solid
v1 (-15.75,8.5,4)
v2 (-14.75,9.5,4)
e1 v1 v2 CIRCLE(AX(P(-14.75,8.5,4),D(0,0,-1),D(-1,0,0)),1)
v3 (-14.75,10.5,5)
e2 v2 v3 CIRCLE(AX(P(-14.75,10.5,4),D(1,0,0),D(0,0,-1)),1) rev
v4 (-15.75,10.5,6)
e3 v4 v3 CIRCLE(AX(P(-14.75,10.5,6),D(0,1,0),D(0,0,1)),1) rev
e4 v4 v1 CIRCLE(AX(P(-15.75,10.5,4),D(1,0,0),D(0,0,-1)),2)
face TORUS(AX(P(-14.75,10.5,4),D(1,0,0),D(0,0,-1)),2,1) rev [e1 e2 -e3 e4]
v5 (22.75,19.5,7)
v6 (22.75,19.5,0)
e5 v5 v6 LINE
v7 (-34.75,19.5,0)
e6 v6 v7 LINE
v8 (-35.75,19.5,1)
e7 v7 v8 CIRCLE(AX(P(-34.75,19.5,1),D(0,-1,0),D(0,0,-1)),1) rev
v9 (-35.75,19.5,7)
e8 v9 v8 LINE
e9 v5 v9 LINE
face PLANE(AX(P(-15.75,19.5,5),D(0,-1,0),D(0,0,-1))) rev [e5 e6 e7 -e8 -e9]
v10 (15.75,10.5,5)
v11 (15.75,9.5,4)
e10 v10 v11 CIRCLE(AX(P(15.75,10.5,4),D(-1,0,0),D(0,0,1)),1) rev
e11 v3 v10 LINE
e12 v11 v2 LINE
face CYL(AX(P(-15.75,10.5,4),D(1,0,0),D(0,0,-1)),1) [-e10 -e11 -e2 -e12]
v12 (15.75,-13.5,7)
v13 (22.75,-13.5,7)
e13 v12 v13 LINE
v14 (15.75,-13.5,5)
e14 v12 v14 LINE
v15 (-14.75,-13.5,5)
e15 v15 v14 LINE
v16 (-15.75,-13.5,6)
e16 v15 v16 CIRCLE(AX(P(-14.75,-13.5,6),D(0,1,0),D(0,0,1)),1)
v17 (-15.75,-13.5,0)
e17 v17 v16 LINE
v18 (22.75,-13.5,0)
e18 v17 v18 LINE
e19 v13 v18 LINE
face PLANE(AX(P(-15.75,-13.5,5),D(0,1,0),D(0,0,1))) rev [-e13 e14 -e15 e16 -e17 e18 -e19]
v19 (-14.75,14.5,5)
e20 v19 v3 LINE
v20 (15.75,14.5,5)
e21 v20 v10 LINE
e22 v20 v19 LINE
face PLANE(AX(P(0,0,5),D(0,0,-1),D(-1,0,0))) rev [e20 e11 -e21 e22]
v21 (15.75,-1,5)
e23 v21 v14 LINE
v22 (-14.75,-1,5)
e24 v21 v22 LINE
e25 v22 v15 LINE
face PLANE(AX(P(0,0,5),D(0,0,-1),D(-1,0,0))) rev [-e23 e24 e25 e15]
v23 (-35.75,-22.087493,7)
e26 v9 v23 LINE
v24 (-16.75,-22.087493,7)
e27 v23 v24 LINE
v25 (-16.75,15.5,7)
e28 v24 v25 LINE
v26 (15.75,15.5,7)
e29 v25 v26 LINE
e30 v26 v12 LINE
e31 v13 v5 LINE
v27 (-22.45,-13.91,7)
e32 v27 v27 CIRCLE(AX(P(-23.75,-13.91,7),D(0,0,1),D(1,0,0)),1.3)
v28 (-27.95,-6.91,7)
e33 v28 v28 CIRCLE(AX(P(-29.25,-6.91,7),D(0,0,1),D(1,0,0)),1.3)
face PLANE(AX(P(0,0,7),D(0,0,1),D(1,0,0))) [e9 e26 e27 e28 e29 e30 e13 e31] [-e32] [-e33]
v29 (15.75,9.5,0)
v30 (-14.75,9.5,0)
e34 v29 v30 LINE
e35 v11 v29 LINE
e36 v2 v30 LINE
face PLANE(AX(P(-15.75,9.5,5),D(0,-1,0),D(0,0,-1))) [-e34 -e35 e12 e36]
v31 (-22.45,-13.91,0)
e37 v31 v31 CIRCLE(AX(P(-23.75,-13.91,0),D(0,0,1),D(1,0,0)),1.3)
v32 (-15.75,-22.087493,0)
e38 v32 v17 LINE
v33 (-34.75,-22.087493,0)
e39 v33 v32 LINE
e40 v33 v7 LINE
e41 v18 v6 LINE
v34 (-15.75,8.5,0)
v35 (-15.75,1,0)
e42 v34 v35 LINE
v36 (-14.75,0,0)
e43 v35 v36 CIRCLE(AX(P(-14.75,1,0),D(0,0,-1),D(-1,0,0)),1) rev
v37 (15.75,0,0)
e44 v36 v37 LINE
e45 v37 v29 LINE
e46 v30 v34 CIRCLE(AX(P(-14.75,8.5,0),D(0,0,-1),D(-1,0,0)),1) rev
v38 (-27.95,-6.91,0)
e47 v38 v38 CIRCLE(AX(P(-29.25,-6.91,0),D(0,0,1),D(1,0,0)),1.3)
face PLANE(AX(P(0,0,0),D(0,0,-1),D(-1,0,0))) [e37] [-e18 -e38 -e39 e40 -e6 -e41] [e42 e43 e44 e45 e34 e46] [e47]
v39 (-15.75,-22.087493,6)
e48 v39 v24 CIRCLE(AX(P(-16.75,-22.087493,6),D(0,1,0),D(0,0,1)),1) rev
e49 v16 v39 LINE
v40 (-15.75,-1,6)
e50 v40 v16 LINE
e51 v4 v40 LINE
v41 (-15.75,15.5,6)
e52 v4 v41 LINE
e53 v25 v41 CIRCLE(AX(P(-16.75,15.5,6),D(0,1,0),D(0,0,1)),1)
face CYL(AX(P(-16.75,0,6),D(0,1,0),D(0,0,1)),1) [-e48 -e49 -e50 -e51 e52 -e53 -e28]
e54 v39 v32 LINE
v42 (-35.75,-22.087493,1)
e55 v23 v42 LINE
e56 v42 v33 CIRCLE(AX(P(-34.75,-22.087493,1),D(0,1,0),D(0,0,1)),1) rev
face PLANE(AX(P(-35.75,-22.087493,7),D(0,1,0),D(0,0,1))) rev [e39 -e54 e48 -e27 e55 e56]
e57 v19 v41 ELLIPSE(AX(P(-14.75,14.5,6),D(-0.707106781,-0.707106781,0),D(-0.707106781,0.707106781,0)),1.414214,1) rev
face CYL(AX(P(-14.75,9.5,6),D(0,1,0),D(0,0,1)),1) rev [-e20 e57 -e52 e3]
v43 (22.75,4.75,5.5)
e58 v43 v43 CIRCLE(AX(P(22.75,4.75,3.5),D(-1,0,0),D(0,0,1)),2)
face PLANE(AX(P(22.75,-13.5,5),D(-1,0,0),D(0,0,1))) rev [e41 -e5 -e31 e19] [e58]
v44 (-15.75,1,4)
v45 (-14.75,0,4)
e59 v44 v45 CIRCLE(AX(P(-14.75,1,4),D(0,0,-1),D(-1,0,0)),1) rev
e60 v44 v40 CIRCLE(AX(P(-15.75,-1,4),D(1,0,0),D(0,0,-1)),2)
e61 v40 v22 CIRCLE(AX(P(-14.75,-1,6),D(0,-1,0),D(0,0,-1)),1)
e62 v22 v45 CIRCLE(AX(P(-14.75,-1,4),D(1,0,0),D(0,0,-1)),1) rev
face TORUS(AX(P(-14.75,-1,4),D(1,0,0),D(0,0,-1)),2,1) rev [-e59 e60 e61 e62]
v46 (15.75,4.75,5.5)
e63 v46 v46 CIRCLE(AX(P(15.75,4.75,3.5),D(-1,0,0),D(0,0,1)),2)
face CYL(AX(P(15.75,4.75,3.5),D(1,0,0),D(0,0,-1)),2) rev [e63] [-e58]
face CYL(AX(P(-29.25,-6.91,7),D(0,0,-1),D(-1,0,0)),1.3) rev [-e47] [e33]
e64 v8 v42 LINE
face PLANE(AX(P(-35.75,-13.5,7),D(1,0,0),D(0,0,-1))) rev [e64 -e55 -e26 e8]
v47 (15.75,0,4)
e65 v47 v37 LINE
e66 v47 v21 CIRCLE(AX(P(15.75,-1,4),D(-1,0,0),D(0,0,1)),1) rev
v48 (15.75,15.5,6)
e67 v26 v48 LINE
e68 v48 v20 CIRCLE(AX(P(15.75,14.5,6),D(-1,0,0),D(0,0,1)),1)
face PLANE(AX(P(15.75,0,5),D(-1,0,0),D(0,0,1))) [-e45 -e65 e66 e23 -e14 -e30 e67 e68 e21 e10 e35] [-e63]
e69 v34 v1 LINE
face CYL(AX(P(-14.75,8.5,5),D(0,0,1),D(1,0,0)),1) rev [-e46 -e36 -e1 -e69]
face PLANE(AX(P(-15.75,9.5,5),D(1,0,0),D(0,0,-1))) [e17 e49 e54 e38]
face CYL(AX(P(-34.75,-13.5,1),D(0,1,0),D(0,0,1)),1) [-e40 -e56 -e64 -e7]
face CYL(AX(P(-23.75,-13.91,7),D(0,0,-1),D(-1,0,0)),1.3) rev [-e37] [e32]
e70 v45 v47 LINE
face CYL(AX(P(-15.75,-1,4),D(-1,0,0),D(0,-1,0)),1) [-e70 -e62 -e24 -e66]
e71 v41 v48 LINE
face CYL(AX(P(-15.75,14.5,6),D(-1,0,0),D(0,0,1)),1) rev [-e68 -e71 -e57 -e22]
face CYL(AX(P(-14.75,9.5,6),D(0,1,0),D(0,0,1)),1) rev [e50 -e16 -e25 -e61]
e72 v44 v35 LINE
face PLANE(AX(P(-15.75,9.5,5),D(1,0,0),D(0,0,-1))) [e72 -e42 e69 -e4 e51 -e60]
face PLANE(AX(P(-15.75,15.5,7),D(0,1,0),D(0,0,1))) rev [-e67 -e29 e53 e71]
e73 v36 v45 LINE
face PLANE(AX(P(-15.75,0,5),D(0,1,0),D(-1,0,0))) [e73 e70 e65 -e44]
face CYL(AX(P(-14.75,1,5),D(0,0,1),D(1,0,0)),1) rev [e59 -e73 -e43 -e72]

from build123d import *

# Parameters (mm, degrees)
SKETCH1_W           = 31.5
SKETCH1_H           = 9.5
BOSS_EXTRUDE1_DEPTH = 5
BOSS_EXTRUDE2_DEPTH = 7
CUT_EXTRUDE1_START  = 22.75
SKETCH4_R           = 2
CUT_EXTRUDE1_DEPTH  = 7
SKETCH5_R           = 1.3
CUT_EXTRUDE2_DEPTH  = 7
FILLET2_R           = 1


with BuildPart() as part:
    # Sketch1 → Boss-Extrude1 (new body)
    with BuildSketch(Plane.XY):
        Polygon((-15.75, -13.5), (22.75, -13.5), (22.75, 19.5), (-15.75, 19.5), (-19.75, 19.5), (-19.75, -13.5), align=None)
        with Locations((0, 4.75)):
            Rectangle(SKETCH1_W, SKETCH1_H, mode=Mode.SUBTRACT)
    extrude(amount=BOSS_EXTRUDE1_DEPTH)

    # Sketch2 → Boss-Extrude2 (add)
    with BuildSketch(Plane.XY):
        Polygon((-15.75, 19.5), (-35.75, 19.5), (-35.75, -13.5), (-35.75, -22.087493002), (-15.75, -22.087493002), (-15.75, -13.5), (-15.75, 15.5), (15.75, 15.5), (15.75, 0), (15.75, -13.5), (16.597702011, -13.5), (22.75, -13.5), (22.75, 19.5), (15.756062461, 19.5), align=None)
    extrude(amount=BOSS_EXTRUDE2_DEPTH)

    # Sketch4 → Cut-Extrude1 (cut)
    with BuildSketch(Plane(origin=(0, 0, 0), x_dir=(0, 0, -1), z_dir=(1, 0, 0)).offset(CUT_EXTRUDE1_START)):
        with Locations(Location((-3.5, 4.75, 0), (0, 0, 180))):
            Circle(SKETCH4_R)
    extrude(amount=-CUT_EXTRUDE1_DEPTH, mode=Mode.SUBTRACT)

    # Sketch5 → Cut-Extrude2 (cut)
    with BuildSketch(Plane.XY):
        with Locations((-23.75, -13.91)):
            Circle(SKETCH5_R)
        with Locations((-29.25, -6.91)):
            Circle(SKETCH5_R)
    extrude(amount=CUT_EXTRUDE2_DEPTH, mode=Mode.SUBTRACT)

    # Fillet2
    fillet2_edges = [part.edges().sort_by_distance(p)[0] for p in [
        (-15.75, -6.75, 5),
        (0, 15.5, 5),
        (-15.75, 12.5, 5),
        (-15.75, 0, 2.5),
        (-15.75, 9.5, 2.5),
        (-15.75, -3.293746501, 7),
        (0, 0, 5),
        (0, 9.5, 5),
        (-35.75, -1.293746501, 0),
    ]]
    fillet(fillet2_edges, radius=FILLET2_R - 0.0001)  # a hair under: the kernel refuses the full size


solid = part.part
